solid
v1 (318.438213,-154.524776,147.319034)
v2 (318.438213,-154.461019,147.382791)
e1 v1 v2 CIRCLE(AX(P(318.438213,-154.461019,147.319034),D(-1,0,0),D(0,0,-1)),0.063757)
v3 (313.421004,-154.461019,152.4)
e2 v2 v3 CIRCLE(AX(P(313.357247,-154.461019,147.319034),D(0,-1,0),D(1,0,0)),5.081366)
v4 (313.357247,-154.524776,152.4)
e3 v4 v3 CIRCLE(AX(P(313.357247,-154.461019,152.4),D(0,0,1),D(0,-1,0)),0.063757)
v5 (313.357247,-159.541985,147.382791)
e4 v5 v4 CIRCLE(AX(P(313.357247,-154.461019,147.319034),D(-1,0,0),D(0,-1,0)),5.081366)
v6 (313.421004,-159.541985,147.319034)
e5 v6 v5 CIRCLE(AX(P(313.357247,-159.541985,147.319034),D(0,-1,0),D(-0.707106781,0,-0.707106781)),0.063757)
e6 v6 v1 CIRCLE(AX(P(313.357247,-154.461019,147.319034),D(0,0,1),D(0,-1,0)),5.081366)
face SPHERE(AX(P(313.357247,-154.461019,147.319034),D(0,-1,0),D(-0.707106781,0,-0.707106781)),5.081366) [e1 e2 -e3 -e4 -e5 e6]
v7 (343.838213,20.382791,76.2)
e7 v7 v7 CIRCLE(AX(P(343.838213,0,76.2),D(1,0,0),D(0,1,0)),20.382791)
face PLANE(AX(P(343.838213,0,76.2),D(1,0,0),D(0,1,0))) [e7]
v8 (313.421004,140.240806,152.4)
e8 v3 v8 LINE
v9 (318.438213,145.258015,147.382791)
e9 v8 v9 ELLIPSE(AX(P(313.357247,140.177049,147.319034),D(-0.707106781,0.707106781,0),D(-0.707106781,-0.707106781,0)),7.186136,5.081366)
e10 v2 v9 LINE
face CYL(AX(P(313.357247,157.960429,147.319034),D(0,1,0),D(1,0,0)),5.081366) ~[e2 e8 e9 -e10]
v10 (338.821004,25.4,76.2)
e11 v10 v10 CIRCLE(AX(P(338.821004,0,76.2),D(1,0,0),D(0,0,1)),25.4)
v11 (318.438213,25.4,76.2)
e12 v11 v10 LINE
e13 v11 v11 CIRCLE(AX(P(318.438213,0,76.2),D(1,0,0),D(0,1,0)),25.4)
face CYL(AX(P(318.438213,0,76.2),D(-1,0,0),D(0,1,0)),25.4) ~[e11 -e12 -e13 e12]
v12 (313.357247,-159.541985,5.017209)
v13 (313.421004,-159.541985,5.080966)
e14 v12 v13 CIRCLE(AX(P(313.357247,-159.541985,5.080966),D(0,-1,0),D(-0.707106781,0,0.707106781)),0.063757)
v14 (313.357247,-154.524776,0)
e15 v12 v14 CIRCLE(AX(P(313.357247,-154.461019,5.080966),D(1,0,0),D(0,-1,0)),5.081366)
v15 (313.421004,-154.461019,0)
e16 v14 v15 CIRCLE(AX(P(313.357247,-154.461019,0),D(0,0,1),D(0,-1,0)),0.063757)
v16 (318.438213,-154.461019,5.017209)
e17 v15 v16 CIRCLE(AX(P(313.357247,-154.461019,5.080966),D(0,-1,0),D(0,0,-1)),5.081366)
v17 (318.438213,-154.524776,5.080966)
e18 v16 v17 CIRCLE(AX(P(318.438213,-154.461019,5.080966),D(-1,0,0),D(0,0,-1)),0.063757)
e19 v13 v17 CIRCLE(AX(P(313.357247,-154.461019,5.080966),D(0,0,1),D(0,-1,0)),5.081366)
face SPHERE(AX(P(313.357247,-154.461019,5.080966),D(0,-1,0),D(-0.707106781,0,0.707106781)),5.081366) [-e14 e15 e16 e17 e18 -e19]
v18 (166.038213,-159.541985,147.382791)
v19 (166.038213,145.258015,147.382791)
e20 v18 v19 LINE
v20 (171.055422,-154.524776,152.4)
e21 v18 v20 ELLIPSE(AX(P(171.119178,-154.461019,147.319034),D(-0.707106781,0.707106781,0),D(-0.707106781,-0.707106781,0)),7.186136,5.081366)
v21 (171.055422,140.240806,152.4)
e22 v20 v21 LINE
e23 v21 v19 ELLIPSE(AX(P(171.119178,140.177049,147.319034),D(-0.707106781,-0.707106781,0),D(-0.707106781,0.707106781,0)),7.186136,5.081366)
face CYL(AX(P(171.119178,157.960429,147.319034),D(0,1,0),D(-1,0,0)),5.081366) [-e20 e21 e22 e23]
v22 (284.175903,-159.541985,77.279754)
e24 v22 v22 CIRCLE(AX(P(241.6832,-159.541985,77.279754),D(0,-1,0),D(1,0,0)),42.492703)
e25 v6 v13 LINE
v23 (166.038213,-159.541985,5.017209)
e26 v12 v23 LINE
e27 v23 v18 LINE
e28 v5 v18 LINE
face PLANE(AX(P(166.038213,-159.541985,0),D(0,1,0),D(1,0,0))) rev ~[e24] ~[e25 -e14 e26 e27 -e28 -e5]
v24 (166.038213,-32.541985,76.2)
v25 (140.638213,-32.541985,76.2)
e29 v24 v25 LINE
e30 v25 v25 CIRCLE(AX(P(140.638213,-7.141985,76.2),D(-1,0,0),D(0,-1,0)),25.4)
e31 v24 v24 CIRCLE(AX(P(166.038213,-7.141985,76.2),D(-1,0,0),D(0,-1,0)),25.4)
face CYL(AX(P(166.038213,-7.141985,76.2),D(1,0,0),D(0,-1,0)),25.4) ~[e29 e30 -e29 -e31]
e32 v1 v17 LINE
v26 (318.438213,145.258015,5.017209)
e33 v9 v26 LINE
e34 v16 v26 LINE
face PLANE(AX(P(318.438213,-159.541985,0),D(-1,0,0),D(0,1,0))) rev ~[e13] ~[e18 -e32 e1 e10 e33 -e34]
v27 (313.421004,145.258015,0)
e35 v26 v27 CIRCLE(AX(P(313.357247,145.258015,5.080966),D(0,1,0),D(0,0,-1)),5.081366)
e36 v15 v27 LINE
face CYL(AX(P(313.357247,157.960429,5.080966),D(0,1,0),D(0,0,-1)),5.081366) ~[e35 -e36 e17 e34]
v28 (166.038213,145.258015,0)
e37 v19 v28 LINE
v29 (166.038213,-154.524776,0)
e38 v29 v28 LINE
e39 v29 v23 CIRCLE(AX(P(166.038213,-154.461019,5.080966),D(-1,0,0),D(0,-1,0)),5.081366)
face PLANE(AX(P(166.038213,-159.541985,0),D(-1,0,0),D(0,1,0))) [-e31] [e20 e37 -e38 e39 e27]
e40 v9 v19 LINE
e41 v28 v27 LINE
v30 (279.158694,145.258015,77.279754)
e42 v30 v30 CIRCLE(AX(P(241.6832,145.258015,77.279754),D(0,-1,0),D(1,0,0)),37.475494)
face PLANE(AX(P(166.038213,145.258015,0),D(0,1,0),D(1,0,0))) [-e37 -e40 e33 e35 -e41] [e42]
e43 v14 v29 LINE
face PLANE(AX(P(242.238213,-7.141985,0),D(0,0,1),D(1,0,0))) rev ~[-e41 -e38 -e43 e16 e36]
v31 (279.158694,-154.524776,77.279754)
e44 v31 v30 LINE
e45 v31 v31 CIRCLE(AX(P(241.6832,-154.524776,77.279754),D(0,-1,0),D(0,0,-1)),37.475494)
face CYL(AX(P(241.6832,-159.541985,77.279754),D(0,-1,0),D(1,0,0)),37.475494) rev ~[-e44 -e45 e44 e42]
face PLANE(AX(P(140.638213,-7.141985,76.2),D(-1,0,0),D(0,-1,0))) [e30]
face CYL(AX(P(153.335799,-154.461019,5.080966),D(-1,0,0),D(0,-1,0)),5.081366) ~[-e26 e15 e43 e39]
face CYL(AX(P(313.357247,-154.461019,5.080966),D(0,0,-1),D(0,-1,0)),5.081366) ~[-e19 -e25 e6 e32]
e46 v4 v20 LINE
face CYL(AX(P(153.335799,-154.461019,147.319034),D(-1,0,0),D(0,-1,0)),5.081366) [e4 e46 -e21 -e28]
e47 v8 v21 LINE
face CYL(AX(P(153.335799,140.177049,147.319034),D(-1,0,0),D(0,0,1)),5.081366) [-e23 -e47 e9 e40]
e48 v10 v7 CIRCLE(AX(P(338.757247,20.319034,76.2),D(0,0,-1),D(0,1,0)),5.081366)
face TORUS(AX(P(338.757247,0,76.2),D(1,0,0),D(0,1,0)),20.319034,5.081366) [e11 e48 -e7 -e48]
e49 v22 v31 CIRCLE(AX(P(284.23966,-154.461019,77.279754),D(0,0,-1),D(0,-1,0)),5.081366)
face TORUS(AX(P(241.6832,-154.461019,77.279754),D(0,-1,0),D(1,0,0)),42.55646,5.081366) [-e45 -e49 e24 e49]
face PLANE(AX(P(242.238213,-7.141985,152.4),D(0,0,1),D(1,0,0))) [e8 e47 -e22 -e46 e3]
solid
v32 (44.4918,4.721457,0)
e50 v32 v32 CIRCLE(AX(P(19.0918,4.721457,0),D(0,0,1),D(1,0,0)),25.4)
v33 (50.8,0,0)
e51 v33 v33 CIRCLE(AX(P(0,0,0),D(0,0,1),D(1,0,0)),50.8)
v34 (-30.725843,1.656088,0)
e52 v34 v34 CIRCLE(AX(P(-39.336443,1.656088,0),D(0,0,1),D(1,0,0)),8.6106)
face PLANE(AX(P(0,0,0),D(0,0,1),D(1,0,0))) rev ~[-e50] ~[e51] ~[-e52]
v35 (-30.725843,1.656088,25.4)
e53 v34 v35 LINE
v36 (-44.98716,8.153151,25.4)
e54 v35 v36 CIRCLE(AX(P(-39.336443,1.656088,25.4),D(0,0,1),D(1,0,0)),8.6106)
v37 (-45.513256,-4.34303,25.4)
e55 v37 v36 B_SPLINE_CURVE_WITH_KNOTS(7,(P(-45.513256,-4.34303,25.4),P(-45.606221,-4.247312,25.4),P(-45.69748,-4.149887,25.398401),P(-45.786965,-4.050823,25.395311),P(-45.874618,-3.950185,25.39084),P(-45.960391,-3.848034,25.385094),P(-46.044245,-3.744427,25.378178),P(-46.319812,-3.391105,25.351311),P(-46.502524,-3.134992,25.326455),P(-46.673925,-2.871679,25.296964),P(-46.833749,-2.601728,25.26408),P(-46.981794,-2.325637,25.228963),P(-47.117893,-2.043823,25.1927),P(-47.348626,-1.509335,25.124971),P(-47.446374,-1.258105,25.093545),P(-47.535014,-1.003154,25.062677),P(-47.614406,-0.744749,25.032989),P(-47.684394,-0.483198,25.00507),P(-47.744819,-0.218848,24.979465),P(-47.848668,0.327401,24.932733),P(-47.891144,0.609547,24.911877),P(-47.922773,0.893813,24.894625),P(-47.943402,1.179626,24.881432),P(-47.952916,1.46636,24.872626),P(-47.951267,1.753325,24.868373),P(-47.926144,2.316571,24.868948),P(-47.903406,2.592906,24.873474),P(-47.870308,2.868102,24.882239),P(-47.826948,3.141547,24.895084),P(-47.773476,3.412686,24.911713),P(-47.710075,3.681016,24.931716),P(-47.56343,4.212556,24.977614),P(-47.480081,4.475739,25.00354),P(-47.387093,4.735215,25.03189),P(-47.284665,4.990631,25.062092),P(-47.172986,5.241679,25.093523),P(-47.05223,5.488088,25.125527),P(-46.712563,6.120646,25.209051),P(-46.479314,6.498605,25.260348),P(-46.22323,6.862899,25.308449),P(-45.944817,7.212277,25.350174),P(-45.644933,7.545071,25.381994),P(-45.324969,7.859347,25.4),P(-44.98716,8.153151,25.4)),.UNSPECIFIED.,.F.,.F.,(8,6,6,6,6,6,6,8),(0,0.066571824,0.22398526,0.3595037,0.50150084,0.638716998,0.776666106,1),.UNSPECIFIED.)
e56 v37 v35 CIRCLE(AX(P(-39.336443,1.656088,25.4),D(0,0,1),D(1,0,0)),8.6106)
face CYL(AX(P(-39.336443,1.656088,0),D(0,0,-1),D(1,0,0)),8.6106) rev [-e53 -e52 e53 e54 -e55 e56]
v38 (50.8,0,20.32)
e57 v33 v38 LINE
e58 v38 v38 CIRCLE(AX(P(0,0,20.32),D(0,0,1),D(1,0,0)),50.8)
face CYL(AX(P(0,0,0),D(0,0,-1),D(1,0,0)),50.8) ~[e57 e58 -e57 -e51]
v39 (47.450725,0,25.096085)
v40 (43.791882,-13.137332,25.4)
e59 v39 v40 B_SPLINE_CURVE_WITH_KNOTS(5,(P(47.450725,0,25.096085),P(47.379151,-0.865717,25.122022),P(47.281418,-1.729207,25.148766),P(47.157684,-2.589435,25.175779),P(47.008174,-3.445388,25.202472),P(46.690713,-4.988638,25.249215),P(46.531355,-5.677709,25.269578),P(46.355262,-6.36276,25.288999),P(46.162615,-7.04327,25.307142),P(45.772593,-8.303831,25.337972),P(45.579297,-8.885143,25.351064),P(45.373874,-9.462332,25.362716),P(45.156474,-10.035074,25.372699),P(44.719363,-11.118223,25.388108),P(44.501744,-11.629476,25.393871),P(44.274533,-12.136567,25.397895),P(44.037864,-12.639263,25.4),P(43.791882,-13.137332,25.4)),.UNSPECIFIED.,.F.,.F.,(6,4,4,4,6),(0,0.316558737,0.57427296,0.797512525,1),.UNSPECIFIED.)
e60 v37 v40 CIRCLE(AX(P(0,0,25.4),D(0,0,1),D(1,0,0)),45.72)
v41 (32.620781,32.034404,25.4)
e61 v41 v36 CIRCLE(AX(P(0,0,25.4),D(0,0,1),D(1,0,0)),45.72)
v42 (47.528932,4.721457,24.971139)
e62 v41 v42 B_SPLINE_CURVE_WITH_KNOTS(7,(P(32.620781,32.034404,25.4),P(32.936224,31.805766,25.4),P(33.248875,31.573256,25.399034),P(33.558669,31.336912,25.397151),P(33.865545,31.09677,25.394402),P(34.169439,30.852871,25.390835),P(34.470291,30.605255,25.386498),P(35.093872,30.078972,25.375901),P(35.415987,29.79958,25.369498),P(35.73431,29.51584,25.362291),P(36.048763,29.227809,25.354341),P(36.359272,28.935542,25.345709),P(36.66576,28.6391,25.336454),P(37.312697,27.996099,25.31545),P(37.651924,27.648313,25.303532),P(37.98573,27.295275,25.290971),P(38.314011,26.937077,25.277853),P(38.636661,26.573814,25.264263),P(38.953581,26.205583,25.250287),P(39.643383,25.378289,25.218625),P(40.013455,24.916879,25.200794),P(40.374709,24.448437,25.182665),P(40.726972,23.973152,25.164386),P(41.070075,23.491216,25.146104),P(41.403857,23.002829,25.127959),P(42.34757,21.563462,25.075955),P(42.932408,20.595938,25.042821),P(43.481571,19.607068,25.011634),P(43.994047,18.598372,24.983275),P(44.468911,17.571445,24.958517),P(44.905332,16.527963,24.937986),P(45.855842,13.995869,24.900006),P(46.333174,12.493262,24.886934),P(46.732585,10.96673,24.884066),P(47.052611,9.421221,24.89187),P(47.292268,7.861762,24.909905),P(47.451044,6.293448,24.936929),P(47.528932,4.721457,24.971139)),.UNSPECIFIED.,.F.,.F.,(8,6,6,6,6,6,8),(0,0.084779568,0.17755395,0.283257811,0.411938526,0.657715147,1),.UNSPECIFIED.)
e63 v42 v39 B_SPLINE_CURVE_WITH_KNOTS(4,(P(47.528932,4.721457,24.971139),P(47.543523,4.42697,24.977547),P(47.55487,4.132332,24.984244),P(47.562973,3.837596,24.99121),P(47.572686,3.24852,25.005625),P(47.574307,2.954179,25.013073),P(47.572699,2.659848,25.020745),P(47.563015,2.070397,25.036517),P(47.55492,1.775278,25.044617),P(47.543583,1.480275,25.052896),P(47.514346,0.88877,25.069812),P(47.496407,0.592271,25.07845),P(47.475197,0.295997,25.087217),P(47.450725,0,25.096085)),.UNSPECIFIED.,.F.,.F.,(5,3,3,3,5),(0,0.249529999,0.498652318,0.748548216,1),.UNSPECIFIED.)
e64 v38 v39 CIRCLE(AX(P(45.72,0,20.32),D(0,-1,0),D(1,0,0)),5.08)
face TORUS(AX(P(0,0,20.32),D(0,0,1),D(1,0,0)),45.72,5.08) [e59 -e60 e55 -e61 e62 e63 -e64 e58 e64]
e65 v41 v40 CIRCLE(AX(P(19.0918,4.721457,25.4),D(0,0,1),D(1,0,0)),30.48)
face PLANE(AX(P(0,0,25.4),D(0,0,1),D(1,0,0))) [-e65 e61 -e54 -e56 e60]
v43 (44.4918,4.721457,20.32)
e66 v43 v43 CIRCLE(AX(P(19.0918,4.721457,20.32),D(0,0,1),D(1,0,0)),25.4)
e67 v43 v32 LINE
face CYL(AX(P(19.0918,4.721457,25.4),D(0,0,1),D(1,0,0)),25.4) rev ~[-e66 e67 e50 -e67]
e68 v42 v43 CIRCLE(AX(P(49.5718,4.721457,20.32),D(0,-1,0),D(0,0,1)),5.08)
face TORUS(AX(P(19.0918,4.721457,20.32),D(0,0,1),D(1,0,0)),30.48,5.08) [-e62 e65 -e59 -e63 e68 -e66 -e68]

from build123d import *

# Parameters (mm, degrees)
F0_R            = 50.8
F0_R_2          = 8.6106
F1_DEPTH        = 25.4
F2_W            = 152.4
F2_H            = 304.8
F3_DEPTH        = 152.4
F5_DEPTH        = 304.8
F6_R            = 25.4
F7_DEPTH        = 25.4
F8_R            = 25.4
F9_DEPTH        = 25.4
F10_R           = 37.4754940494
F11_DEPTH       = 1270
F12_DEPTH       = 25.4
F13_DEPTH       = 25.4
F14_R           = 25.4
F15_DEPTH       = 25.4
F16_2_T1_DEPTH  = 160.0214485675
F16_2_T3_DEPTH  = 177.8048285058
F16_2_T5_DEPTH  = 330.2048285058
F16_2_T7_DEPTH  = 312.4214485675
F16_2_T9_DEPTH  = 142.2380686292
F16_2_S13_W     = 5.5895022539
F16_2_S13_H     = 5.5895022539
F16_2_T14_DEPTH = 5.589502254
F16_2_S19_W     = 5.5895022539
F16_2_S19_H     = 5.5895022539
F16_2_T20_DEPTH = 5.589502254


# Not quite as in the source:
# - a fillet or chamfer that OpenCascade refuses, or shapes differently, is made with other operations: its cross-section is extruded or revolved along the edge and cut away or added


with BuildPart() as f1:
    # F0 (on Top) → F1 (new body)
    with BuildSketch(Plane.XY):
        Circle(F0_R)
        with Locations((-39.3364430946, 1.6560875433)):
            Circle(F0_R_2, mode=Mode.SUBTRACT)
    extrude(amount=F1_DEPTH)

    # F14 (on face) → F15 (cut)
    with BuildSketch(Plane.XY.offset(25.4)):
        with Locations((19.0917998552, 4.7214571387)):
            Circle(F14_R)
    extrude(amount=-F15_DEPTH, mode=Mode.SUBTRACT)

    # F16: fillet of radius 5.08 on 2 edges, made by hand

    # F16_s1 → F16_t2 (revolve, cut)
    with BuildSketch(Plane.XZ.offset(-4.7214571387)):
        with BuildLine():
            ThreePointArc((49.5717998552, 25.4), (45.9796974068, 23.9121024484), (44.4917998552, 20.32))
            Line((44.4917998552, 20.32), (44.4917998552, 25.4))
            Line((44.4917998552, 25.4), (49.5717998552, 25.4))
        make_face()
    revolve(axis=Axis((19.0917998552, 4.7214571387, 25.4), (0, 0, 1)), mode=Mode.SUBTRACT)

    # F16_s3 → F16_t4 (revolve, cut)
    with BuildSketch(Plane.XZ):
        with BuildLine():
            ThreePointArc((50.8, 20.32), (49.3121024484, 23.9121024484), (45.72, 25.4))
            Line((45.72, 25.4), (50.8, 25.4))
            Line((50.8, 25.4), (50.8, 20.32))
        make_face()
    revolve(axis=Axis((0, 0, 25.4), (0, 0, 1)), mode=Mode.SUBTRACT)


with BuildPart() as f3:
    # F2 (on Top) → F3 (new body)
    with BuildSketch(Plane.XY):
        with Locations((242.2382127733, -7.1419849992)):
            Rectangle(F2_W, F2_H)
    extrude(amount=F3_DEPTH)

    # F4 (on face) → F5 (join)
    with BuildSketch(Plane.XZ.offset(159.5419849992)):
        with BuildLine():
            ThreePointArc((242.2382127733, 0), (296.1197494997, 22.3184632736), (318.4382127733, 76.2))
            ThreePointArc((318.4382127733, 76.2), (296.1197494997, 130.0815367264), (242.2382127733, 152.4))
            ThreePointArc((242.2382127733, 152.4), (188.3566760469, 130.0815367264), (166.0382127733, 76.2))
            ThreePointArc((166.0382127733, 76.2), (188.3566760469, 22.3184632736), (242.2382127733, 0))
        make_face()
    extrude(amount=-F5_DEPTH)

    # F6 (on face) → F7 (join)
    with BuildSketch(Plane.YZ.offset(318.4382127733)):
        with Locations((0, 76.2)):
            Circle(F6_R)
    extrude(amount=F7_DEPTH)

    # F8 (on face) → F9 (join)
    with BuildSketch(Plane(origin=(166.0382127733, 0, 0), x_dir=(0, -1, 0), z_dir=(-1, 0, 0))):
        with Locations((7.1419849992, 76.2)):
            Circle(F8_R)
    extrude(amount=F9_DEPTH)

    # F10 (on face) → F11 (cut)
    with BuildSketch(Plane.XZ.offset(159.5419849992)):
        with Locations((241.6832000017, 77.279753983)):
            Circle(F10_R)
    extrude(amount=-F11_DEPTH, mode=Mode.SUBTRACT)

    # F8 (on face) + F6 (on face) → F12 (join)
    with BuildSketch(Plane(origin=(166.0382127733, 0, 0), x_dir=(0, -1, 0), z_dir=(-1, 0, 0))):
        with Locations((7.1419849992, 76.2)):
            Circle(F8_R)
    with BuildSketch(Plane.YZ.offset(318.4382127733)):
        with Locations((0, 76.2)):
            Circle(F6_R)
    extrude(amount=-F12_DEPTH, dir=(-1, 0, 0))

    # F8 (on face) → F13 (join)
    with BuildSketch(Plane(origin=(166.0382127733, 0, 0), x_dir=(0, -1, 0), z_dir=(-1, 0, 0))):
        with Locations((7.1419849992, 76.2)):
            Circle(F8_R)
    extrude(amount=F13_DEPTH)

    # F16#2: fillet of radius 5.08 on 9 edges, made by hand

    # F16_2_s2 → F16_2_t1 (cut)
    with BuildSketch(Plane.YZ.offset(153.3357985204)):
        with BuildLine():
            ThreePointArc((-159.5423849992, 147.3190343146), (-158.0540874476, 150.9121024484), (-154.4610193138, 152.4004))
            Line((-154.4610193138, 152.4004), (-154.4610193138, 152.9085365685))
            ThreePointArc((-154.4610193138, 152.9085365685), (-157.0015021565, 152.9081365685), (-159.5419849992, 152.9081365685))
            Line((-159.5419849992, 152.9081365685), (-160.0501215677, 152.4))
            ThreePointArc((-160.0501215677, 152.4), (-160.0501215677, 149.8595171573), (-160.0505215677, 147.3190343146))
            Line((-160.0505215677, 147.3190343146), (-159.5423849992, 147.3190343146))
        make_face()
        with BuildLine():
            ThreePointArc((-159.5423849992, 5.0809656854), (-158.0540874476, 1.4878975516), (-154.4610193138, -0.0004))
            Line((-154.4610193138, -0.0004), (-154.4610193138, -0.5085365685))
            ThreePointArc((-154.4610193138, -0.5085365685), (-157.0015021565, -0.5081365685), (-159.5419849992, -0.5081365685))
            Line((-159.5419849992, -0.5081365685), (-160.0501215677, 0))
            ThreePointArc((-160.0501215677, 0), (-160.0501215677, 2.5404828427), (-160.0505215677, 5.0809656854))
            Line((-160.0505215677, 5.0809656854), (-159.5423849992, 5.0809656854))
        make_face()
    extrude(amount=F16_2_T1_DEPTH, mode=Mode.SUBTRACT)

    # F16_2_s4 → F16_2_t3 (cut)
    with BuildSketch(Plane.YZ.offset(153.3357985204)):
        with BuildLine():
            ThreePointArc((140.1770493154, 152.4004), (143.7701174492, 150.9121024484), (145.2584150008, 147.3190343146))
            Line((145.2584150008, 147.3190343146), (145.7665515694, 147.3190343146))
            ThreePointArc((145.7665515694, 147.3190343146), (145.7661515694, 149.8595171573), (145.7661515694, 152.4))
            Line((145.7661515694, 152.4), (145.2580150008, 152.9081365685))
            ThreePointArc((145.2580150008, 152.9081365685), (142.7175321581, 152.9081365685), (140.1770493154, 152.9085365685))
            Line((140.1770493154, 152.9085365685), (140.1770493154, 152.4004))
        make_face()
    extrude(amount=F16_2_T3_DEPTH, mode=Mode.SUBTRACT)

    # F16_2_s6 → F16_2_t5 (cut)
    with BuildSketch(Plane.XZ.offset(-157.9604292537)):
        with BuildLine():
            ThreePointArc((166.0378127733, 147.3190343146), (167.5261103249, 150.9121024484), (171.1191784587, 152.4004))
            Line((171.1191784587, 152.4004), (171.1191784587, 152.9085365685))
            ThreePointArc((171.1191784587, 152.9085365685), (168.578695616, 152.9081365685), (166.0382127733, 152.9081365685))
            Line((166.0382127733, 152.9081365685), (165.5300762047, 152.4))
            ThreePointArc((165.5300762047, 152.4), (165.5300762047, 149.8595171573), (165.5296762047, 147.3190343146))
            Line((165.5296762047, 147.3190343146), (166.0378127733, 147.3190343146))
        make_face()
    extrude(amount=F16_2_T5_DEPTH, mode=Mode.SUBTRACT)

    # F16_2_s8 → F16_2_t7 (cut)
    with BuildSketch(Plane.XZ.offset(-157.9604292537)):
        with BuildLine():
            ThreePointArc((318.4386127733, 147.3190343146), (316.9503152217, 150.9121024484), (313.3572470879, 152.4004))
            Line((313.3572470879, 152.4004), (313.3572470879, 152.9085365685))
            ThreePointArc((313.3572470879, 152.9085365685), (315.8977299306, 152.9081365685), (318.4382127733, 152.9081365685))
            Line((318.4382127733, 152.9081365685), (318.9463493418, 152.4))
            ThreePointArc((318.9463493418, 152.4), (318.9463493418, 149.8595171573), (318.9467493418, 147.3190343146))
            Line((318.9467493418, 147.3190343146), (318.4386127733, 147.3190343146))
        make_face()
        with BuildLine():
            ThreePointArc((313.3572470879, -0.0004), (316.9503152217, 1.4878975516), (318.4386127733, 5.0809656854))
            Line((318.4386127733, 5.0809656854), (318.9467493418, 5.0809656854))
            ThreePointArc((318.9467493418, 5.0809656854), (318.9463493418, 2.5404828427), (318.9463493418, 0))
            Line((318.9463493418, 0), (318.4382127733, -0.5081365685))
            ThreePointArc((318.4382127733, -0.5081365685), (315.8977299306, -0.5081365685), (313.3572470879, -0.5085365685))
            Line((313.3572470879, -0.5085365685), (313.3572470879, -0.0004))
        make_face()
    extrude(amount=F16_2_T7_DEPTH, mode=Mode.SUBTRACT)

    # F16_2_s10 → F16_2_t9 (cut)
    with BuildSketch(Plane.XY.offset(5.0809656854)):
        with BuildLine():
            ThreePointArc((313.3572470879, -159.5423849992), (316.9503152217, -158.0540874476), (318.4386127733, -154.4610193138))
            Line((318.4386127733, -154.4610193138), (318.9467493418, -154.4610193138))
            ThreePointArc((318.9467493418, -154.4610193138), (318.9463493418, -157.0015021565), (318.9463493418, -159.5419849992))
            Line((318.9463493418, -159.5419849992), (318.4382127733, -160.0501215677))
            ThreePointArc((318.4382127733, -160.0501215677), (315.8977299306, -160.0501215677), (313.3572470879, -160.0505215677))
            Line((313.3572470879, -160.0505215677), (313.3572470879, -159.5423849992))
        make_face()
    extrude(amount=F16_2_T9_DEPTH, mode=Mode.SUBTRACT)


with BuildPart() as f16_2_tool12:
    # F16_2_s13 → F16_2_t14 (new body)
    with BuildSketch(Plane.XZ.offset(154.4610193138)):
        with Locations((316.1519982148, 150.1137854416)):
            Rectangle(F16_2_S13_W, F16_2_S13_H)
    extrude(amount=F16_2_T14_DEPTH)

    # F16_2_s15 → F16_2_t16 (revolve, cut)
    with BuildSketch(Plane(origin=(313.3572470879, -154.4610193138, 147.3190343146), x_dir=(-0.7071067812, 0, -0.7071067812), z_dir=(-0.7071067812, 0, 0.7071067812))):
        with BuildLine():
            ThreePointArc((0, -5.0813656854), (5.0813656854, 0), (0, 5.0813656854))
            Line((0, 5.0813656854), (0, -5.0813656854))
        make_face()
    revolve(axis=Axis((313.3572470879, -154.4610193138, 147.3190343146), (0, -1, 0)), mode=Mode.SUBTRACT)


with BuildPart() as f3_1:
    add(f3.part)

    # F16_2_t11: cut F16_2_tool12
    add(f16_2_tool12.part, mode=Mode.SUBTRACT)


with BuildPart() as f16_2_tool18:
    # F16_2_s19 → F16_2_t20 (new body)
    with BuildSketch(Plane.XZ.offset(154.4610193138)):
        with Locations((316.1519982148, 2.2862145584)):
            Rectangle(F16_2_S19_W, F16_2_S19_H)
    extrude(amount=F16_2_T20_DEPTH)

    # F16_2_s21 → F16_2_t22 (revolve, cut)
    with BuildSketch(Plane(origin=(313.3572470879, -154.4610193138, 5.0809656854), x_dir=(-0.7071067812, 0, 0.7071067812), z_dir=(0.7071067812, 0, 0.7071067812))):
        with BuildLine():
            ThreePointArc((0, -5.0813656854), (5.0813656854, 0), (0, 5.0813656854))
            Line((0, 5.0813656854), (0, -5.0813656854))
        make_face()
    revolve(axis=Axis((313.3572470879, -154.4610193138, 5.0809656854), (0, -1, 0)), mode=Mode.SUBTRACT)


with BuildPart() as f3_2:
    add(f3_1.part)

    # F16_2_t17: cut F16_2_tool18
    add(f16_2_tool18.part, mode=Mode.SUBTRACT)

    # F16_2_s23 → F16_2_t24 (revolve, cut)
    with BuildSketch(Plane.XY.offset(76.2)):
        with BuildLine():
            ThreePointArc((338.7572470879, 25.4004), (342.3503152217, 23.9121024484), (343.8386127733, 20.3190343146))
            Line((343.8386127733, 20.3190343146), (344.3467493418, 20.3190343146))
            ThreePointArc((344.3467493418, 20.3190343146), (344.3463493418, 22.8595171573), (344.3463493418, 25.4))
            Line((344.3463493418, 25.4), (343.8382127733, 25.9081365685))
            ThreePointArc((343.8382127733, 25.9081365685), (341.2977299306, 25.9081365685), (338.7572470879, 25.9085365685))
            Line((338.7572470879, 25.9085365685), (338.7572470879, 25.4004))
        make_face()
    revolve(axis=Axis((343.8382127733, 0, 76.2), (1, 0, 0)), mode=Mode.SUBTRACT)

    # F16_2_s25 → F16_2_t26 (revolve, cut)
    with BuildSketch(Plane.XY.offset(77.279753983)):
        with BuildLine():
            ThreePointArc((284.2396597365, -159.5423849992), (280.6465916027, -158.0540874476), (279.1582940511, -154.4610193138))
            Line((279.1582940511, -154.4610193138), (278.6501574825, -154.4610193138))
            ThreePointArc((278.6501574825, -154.4610193138), (278.6505574825, -157.0015021565), (278.6505574825, -159.5419849992))
            Line((278.6505574825, -159.5419849992), (279.1586940511, -160.0501215677))
            ThreePointArc((279.1586940511, -160.0501215677), (281.6991768938, -160.0501215677), (284.2396597365, -160.0505215677))
            Line((284.2396597365, -160.0505215677), (284.2396597365, -159.5423849992))
        make_face()
    revolve(axis=Axis((241.6832000017, -159.5419849992, 77.279753983), (0, -1, 0)), mode=Mode.SUBTRACT)


solid = Compound([f1.part, f3_2.part])
